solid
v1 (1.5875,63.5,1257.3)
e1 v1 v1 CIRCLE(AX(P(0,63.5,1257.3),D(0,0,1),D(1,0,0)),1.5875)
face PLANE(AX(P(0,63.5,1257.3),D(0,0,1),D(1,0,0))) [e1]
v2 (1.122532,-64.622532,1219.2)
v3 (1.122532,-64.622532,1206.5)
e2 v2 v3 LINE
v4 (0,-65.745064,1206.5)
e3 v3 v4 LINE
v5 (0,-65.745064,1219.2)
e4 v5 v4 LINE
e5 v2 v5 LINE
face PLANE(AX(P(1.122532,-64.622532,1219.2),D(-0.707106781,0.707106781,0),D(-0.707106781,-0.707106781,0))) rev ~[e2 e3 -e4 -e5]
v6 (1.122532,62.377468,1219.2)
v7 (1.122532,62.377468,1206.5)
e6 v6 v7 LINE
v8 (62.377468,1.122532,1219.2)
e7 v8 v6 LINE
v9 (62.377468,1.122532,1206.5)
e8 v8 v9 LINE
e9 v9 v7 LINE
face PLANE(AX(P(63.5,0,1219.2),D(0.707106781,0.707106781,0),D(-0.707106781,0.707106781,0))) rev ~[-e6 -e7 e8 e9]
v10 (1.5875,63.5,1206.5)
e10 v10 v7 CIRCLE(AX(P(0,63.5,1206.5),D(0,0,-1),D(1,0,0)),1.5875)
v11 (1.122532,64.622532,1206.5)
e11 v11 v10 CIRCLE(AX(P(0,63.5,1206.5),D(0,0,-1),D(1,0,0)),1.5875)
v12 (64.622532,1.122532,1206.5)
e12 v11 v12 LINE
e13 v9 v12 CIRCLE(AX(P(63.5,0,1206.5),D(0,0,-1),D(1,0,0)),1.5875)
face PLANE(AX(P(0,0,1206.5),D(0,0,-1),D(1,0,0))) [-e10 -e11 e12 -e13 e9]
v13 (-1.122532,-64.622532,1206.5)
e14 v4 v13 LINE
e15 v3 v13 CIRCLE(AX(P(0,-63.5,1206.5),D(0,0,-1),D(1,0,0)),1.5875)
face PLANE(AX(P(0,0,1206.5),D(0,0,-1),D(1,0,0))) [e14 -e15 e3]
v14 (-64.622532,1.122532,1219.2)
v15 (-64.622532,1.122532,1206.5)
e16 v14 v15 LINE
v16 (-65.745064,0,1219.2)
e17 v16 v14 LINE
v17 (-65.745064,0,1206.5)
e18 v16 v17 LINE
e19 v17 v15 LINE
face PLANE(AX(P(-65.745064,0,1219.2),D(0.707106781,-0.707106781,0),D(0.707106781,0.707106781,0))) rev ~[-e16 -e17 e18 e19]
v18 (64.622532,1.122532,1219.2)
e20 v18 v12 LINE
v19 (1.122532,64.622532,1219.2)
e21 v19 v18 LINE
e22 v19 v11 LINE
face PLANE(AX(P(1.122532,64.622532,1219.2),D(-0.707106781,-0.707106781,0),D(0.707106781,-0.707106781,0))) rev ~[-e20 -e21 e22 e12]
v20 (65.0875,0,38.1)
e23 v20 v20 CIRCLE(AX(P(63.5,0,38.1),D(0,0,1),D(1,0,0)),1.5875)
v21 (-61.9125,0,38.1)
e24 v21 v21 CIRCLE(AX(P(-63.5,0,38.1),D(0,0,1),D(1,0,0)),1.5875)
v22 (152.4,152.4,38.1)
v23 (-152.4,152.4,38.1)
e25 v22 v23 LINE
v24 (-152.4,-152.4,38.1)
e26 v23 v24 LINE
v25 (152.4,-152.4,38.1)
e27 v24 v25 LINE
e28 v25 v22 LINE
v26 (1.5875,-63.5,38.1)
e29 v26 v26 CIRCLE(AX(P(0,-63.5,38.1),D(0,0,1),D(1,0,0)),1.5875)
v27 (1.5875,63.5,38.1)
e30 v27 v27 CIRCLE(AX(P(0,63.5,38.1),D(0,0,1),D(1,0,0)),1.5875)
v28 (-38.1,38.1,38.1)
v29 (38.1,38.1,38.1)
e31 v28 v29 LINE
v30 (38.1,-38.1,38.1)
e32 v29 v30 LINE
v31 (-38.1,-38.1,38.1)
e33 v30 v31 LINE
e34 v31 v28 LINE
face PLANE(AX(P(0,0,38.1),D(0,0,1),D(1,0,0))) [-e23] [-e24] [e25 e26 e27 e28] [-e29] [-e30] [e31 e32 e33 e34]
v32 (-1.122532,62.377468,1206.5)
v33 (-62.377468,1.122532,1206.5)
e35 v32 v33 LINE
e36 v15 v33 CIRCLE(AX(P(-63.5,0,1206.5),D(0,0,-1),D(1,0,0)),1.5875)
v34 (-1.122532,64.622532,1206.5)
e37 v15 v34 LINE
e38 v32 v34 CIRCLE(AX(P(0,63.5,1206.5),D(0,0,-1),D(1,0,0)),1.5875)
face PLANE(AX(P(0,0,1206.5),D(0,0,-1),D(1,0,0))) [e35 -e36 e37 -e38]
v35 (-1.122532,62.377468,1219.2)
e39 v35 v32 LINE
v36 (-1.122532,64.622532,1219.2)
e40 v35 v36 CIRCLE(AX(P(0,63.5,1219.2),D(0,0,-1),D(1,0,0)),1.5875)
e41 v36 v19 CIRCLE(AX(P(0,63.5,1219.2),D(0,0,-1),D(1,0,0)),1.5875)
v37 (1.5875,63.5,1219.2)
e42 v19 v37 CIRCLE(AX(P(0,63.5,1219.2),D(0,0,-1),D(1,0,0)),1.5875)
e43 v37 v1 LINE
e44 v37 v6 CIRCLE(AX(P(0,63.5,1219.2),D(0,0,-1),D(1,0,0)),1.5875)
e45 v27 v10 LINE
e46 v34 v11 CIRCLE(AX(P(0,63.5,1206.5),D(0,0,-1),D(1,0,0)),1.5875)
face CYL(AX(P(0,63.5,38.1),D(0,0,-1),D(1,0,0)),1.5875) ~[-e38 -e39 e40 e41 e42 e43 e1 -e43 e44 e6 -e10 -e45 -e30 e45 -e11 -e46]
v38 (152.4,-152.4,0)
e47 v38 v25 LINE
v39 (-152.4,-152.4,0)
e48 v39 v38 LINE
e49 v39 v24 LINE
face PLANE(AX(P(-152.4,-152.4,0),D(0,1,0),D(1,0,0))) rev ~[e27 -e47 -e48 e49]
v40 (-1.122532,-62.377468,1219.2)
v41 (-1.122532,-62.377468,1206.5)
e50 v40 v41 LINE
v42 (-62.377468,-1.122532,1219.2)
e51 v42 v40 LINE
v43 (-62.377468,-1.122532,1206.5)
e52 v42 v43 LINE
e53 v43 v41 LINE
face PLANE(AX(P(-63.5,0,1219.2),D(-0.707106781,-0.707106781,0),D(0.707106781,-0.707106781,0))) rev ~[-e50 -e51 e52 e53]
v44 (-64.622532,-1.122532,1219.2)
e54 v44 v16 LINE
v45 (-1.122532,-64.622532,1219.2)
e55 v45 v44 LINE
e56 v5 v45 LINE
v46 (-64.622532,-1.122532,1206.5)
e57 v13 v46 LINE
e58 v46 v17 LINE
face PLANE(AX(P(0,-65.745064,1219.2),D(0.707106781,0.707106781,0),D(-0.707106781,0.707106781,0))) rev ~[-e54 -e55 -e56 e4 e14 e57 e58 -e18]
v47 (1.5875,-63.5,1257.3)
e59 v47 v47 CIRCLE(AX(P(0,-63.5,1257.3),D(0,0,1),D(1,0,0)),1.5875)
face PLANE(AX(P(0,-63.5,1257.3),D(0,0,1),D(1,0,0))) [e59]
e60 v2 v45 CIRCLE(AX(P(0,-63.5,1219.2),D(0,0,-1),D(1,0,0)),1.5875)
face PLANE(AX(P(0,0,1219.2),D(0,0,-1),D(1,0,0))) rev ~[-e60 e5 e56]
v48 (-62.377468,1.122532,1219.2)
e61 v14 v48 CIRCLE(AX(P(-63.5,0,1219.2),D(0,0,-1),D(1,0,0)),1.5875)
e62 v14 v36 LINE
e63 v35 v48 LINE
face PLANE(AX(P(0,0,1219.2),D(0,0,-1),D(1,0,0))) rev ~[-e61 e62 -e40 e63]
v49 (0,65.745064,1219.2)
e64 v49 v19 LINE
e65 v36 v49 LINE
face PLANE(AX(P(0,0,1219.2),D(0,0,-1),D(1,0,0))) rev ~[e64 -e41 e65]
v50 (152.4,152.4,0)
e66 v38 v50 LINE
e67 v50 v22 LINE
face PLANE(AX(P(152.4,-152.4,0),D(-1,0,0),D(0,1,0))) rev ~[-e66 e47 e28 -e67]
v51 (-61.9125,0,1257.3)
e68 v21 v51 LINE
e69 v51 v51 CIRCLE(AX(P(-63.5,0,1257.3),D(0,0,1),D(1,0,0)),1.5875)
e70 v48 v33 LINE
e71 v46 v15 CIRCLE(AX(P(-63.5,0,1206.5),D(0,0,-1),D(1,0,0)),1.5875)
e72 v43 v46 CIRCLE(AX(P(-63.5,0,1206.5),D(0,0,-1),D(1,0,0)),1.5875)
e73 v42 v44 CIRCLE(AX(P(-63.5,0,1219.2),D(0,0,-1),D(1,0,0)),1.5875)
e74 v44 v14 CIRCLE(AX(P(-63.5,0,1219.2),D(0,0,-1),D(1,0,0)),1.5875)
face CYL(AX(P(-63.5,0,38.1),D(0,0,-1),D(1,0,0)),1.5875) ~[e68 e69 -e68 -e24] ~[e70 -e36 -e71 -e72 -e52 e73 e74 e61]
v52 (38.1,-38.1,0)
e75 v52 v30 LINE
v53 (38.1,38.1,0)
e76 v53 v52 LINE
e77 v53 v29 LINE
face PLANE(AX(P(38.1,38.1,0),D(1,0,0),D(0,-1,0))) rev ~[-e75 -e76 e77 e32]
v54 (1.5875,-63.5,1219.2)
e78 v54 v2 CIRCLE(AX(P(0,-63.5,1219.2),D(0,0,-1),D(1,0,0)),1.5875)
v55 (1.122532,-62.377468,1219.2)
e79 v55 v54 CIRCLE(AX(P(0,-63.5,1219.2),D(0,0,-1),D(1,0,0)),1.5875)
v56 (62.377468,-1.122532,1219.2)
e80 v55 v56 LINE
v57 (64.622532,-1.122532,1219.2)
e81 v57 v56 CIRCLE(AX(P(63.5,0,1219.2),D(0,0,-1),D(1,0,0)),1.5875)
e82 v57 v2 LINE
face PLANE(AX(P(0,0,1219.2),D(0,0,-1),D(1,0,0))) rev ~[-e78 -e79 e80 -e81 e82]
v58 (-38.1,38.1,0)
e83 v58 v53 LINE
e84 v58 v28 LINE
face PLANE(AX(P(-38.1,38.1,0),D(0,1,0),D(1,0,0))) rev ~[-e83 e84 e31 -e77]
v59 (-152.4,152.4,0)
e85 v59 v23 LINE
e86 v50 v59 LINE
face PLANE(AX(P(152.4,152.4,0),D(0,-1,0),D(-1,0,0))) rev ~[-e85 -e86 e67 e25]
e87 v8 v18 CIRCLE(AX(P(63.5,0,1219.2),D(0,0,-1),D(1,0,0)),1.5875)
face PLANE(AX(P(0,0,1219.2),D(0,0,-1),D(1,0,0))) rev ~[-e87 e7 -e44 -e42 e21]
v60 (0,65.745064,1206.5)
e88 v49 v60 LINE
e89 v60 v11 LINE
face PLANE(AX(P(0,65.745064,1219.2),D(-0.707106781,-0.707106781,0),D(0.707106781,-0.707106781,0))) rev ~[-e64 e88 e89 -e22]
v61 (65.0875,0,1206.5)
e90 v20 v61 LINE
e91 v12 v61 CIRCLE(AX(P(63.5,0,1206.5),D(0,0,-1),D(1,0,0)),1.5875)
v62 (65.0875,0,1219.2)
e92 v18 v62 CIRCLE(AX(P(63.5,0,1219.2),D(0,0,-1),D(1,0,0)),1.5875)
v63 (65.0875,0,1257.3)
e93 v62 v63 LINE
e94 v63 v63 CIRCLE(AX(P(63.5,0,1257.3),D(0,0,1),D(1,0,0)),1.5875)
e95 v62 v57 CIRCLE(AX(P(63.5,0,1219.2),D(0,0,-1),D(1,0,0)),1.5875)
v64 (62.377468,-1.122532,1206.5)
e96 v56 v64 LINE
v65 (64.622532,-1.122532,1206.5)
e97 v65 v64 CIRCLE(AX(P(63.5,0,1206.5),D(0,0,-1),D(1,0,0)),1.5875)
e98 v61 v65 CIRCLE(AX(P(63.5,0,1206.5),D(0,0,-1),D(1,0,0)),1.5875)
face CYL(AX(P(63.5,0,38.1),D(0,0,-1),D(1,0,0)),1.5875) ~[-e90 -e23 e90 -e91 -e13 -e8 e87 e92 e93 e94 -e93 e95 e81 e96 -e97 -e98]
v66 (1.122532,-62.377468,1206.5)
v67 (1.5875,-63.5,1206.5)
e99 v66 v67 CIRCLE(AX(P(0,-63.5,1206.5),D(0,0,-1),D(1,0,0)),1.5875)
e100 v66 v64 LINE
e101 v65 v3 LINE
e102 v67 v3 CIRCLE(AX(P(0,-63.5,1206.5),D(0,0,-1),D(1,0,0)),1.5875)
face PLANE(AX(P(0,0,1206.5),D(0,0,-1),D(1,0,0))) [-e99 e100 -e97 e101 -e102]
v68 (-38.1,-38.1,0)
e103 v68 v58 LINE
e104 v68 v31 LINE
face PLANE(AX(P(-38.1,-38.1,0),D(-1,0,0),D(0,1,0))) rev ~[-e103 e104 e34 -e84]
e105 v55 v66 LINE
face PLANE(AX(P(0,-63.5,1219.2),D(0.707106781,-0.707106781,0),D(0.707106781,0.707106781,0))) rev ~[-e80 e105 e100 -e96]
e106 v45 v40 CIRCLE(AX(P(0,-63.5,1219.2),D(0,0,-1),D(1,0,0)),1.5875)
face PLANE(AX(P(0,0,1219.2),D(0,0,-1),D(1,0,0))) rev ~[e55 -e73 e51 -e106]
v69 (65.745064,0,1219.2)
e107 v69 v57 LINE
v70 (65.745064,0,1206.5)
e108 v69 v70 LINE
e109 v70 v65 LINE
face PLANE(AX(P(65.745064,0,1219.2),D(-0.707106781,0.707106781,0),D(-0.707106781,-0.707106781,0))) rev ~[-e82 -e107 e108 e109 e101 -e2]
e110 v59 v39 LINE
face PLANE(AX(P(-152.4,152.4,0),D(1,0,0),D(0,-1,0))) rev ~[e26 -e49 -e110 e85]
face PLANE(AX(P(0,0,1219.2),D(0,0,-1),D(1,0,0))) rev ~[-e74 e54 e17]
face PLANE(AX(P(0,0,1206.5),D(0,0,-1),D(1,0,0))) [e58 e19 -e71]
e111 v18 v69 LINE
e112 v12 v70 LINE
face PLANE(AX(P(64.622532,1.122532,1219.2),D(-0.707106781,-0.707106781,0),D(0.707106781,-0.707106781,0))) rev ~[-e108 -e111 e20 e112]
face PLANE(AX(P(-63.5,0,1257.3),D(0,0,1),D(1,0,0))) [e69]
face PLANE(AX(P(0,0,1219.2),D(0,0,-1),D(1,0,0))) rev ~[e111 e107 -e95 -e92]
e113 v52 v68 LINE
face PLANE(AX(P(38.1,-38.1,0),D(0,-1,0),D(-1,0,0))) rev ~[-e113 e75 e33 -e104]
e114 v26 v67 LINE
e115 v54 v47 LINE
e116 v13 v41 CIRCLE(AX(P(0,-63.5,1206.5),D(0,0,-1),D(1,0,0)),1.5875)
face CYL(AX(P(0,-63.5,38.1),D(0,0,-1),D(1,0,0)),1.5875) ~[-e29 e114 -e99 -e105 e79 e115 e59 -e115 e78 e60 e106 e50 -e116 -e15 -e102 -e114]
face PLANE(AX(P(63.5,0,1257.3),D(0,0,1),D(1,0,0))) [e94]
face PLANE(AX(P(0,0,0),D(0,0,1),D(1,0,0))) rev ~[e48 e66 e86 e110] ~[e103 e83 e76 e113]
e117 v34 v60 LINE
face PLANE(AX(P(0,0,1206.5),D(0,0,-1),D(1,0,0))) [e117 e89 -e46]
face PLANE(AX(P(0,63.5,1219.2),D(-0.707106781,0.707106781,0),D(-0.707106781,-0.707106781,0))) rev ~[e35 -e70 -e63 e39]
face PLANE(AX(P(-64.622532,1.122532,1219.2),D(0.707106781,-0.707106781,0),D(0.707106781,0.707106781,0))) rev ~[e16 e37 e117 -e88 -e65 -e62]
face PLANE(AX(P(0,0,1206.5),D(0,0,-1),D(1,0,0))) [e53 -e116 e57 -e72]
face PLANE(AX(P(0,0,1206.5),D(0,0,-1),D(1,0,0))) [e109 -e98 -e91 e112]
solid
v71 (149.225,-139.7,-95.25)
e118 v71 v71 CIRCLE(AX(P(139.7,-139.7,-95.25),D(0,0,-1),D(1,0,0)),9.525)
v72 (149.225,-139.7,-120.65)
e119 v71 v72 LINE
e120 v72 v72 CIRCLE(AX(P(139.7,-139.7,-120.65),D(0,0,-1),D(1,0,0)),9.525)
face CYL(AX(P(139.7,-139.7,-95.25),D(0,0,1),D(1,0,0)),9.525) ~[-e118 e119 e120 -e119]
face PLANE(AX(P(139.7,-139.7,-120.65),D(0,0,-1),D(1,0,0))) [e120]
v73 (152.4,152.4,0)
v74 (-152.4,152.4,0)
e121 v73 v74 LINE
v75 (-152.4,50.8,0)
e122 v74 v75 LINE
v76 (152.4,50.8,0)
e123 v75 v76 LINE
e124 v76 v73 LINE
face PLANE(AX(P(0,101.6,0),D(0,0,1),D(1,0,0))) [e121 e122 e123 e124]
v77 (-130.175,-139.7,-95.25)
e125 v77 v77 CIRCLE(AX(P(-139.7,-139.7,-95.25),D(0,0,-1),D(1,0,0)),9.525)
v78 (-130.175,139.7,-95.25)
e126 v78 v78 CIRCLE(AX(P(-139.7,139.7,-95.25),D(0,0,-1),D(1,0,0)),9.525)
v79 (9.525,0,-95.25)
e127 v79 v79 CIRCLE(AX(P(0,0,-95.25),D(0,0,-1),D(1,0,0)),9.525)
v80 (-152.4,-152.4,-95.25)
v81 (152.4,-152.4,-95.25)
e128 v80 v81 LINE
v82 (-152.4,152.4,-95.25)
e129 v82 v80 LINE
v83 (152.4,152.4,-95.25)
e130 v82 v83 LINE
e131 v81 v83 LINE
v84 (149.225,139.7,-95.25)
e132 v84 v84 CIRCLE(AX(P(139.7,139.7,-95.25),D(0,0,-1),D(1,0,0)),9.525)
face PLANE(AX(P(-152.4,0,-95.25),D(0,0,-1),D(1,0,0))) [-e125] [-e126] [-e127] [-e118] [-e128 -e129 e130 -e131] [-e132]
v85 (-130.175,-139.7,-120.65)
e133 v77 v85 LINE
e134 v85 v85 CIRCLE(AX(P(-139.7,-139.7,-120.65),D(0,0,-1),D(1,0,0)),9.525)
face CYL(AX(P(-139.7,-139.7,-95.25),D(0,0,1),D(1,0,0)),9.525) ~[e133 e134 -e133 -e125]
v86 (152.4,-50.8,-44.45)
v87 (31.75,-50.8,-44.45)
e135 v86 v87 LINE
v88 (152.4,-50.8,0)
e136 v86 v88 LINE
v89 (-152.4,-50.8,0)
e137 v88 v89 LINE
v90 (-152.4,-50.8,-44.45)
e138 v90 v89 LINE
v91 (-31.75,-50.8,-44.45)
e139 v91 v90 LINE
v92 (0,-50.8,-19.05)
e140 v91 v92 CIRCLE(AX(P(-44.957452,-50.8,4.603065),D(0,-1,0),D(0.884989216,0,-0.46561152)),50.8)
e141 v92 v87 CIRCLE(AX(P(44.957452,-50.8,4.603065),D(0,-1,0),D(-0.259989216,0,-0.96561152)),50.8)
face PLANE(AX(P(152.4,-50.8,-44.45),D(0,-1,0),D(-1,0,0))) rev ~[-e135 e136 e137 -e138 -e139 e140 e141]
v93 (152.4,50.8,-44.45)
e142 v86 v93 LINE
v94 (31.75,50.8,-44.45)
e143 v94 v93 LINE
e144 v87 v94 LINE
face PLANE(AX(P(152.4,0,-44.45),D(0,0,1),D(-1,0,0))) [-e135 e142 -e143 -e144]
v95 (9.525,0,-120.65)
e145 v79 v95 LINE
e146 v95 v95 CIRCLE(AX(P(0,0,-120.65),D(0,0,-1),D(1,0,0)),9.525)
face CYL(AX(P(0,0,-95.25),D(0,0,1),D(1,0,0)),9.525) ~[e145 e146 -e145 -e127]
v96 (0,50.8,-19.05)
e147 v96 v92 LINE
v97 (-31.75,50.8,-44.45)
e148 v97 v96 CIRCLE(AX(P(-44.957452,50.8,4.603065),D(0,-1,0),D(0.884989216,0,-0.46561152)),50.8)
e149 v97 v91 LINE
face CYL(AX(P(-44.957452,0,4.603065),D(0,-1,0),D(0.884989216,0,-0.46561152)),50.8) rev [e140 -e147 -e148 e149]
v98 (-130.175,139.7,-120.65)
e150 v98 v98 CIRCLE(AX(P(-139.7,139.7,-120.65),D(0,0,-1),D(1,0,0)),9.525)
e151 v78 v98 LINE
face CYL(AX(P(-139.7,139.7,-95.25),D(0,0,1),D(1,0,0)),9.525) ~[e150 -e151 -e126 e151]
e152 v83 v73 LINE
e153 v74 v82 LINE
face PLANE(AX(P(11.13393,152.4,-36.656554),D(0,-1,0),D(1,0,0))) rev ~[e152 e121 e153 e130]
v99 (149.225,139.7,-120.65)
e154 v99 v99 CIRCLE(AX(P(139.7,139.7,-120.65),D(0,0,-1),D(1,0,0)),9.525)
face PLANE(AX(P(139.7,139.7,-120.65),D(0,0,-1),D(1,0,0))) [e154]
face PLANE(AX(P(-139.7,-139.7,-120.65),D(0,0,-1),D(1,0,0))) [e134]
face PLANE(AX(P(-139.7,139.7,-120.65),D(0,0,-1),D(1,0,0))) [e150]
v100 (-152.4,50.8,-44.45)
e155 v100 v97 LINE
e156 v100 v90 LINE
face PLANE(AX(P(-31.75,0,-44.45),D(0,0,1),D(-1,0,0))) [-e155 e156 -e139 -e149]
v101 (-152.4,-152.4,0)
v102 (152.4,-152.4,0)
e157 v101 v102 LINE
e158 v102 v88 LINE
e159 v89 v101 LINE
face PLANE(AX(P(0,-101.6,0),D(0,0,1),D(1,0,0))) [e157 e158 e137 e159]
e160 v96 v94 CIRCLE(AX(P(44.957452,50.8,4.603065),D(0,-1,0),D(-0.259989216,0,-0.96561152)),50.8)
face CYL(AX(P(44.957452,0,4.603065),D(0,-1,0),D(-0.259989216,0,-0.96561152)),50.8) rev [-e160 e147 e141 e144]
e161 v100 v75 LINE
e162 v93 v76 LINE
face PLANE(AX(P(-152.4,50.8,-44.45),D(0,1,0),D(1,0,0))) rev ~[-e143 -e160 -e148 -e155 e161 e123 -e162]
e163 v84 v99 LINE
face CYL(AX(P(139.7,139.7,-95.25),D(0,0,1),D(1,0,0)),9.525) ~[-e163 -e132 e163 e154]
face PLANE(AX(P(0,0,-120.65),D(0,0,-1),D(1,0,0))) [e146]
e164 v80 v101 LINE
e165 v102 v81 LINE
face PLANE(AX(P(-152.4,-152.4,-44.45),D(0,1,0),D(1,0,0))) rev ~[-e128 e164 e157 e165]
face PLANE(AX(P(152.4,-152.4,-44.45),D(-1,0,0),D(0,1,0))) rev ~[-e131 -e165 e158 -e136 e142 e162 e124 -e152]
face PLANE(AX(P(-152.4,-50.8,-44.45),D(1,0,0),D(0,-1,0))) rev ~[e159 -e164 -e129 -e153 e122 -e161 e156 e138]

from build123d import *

# Parameters (mm, degrees)
F1_DEPTH  = 38.1
F3_DEPTH  = 152.4
F5_DEPTH  = 44.45
F6_R      = 9.525
F7_DEPTH  = 25.4
F8_R      = 1.5875
F9_DEPTH  = 1219.2
F12_DEPTH = 12.7


with BuildPart() as f1:
    # F0 (on Top) → F1 (new body)
    with BuildSketch(Plane.XY):
        Polygon((-152.4, 152.4), (-152.4, 0), (-152.4, -152.4), (152.4, -152.4), (152.4, 0), (152.4, 152.4), align=None)
        Polygon((-38.1, 38.1), (0, 38.1), (38.1, 38.1), (38.1, -38.1), (-38.1, -38.1), align=None, mode=Mode.SUBTRACT)
    extrude(amount=F1_DEPTH)

    # F8 (on face) → F9 (join)
    with BuildSketch(Plane.XY.offset(38.1)):
        with Locations((0, 63.5)):
            Circle(F8_R)
        with Locations((63.5, 0)):
            Circle(F8_R)
        with Locations((-63.5, 0)):
            Circle(F8_R)
        with Locations((0, -63.5)):
            Circle(F8_R)
    extrude(amount=F9_DEPTH)

    # F11 (on offset) → F12 (join)
    with BuildSketch(Plane(origin=(0, 0, 1219.2), x_dir=(1, 0, 0), z_dir=(0, 0, -1))):
        Polygon((0, -65.7450640303), (1.1225320151, -64.6225320151), (64.6225320151, -1.1225320151), (65.7450640303, 0), (1.1225320151, 64.6225320151), (0, 65.7450640303), (-65.7450640303, 0), (-64.6225320151, -1.1225320151), align=None)
        Polygon((0, -63.5), (-63.5, 0), (0, 63.5), (63.5, 0), align=None, mode=Mode.SUBTRACT)
    extrude(amount=F12_DEPTH)


with BuildPart() as f3:
    # F2 (on Front) → F3 (new body, symmetric)
    with BuildSketch(Plane.XZ):
        with BuildLine():
            ThreePointArc((31.75, -44.45), (13.2229437572, -35.0650703036), (0, -19.05))
            Line((0, -19.05), (0, -44.45))
            Line((0, -44.45), (31.75, -44.45))
        make_face()
        with BuildLine():
            Line((0, -44.45), (0, -19.05))
            ThreePointArc((0, -19.05), (-13.2229437572, -35.0650703036), (-31.75, -44.45))
            Line((-31.75, -44.45), (0, -44.45))
        make_face()
        Polygon((31.75, -44.45), (0, -44.45), (-31.75, -44.45), (-152.4, -44.45), (-152.4, -95.25), (152.4, -95.25), (152.4, -44.45), align=None)
    extrude(amount=F3_DEPTH, both=True)

    # F4 (on face) → F5 (join)
    with BuildSketch(Plane.XY.offset(-44.45)):
        Polygon((152.4, -50.8), (0, -50.8), (-152.4, -50.8), (-152.4, -152.4), (152.4, -152.4), align=None)
        Polygon((-152.4, 50.8), (0, 50.8), (152.4, 50.8), (152.4, 152.4), (-152.4, 152.4), align=None)
    extrude(amount=F5_DEPTH)

    # F6 (on face) → F7 (join)
    with BuildSketch(Plane(origin=(0, 0, -95.25), x_dir=(1, 0, 0), z_dir=(0, 0, -1))):
        with Locations((-139.7, 139.7)):
            Circle(F6_R)
        with Locations((139.7, 139.7)):
            Circle(F6_R)
        with Locations((139.7, -139.7)):
            Circle(F6_R)
        with Locations((-139.7, -139.7)):
            Circle(F6_R)
        Circle(F6_R)
    extrude(amount=F7_DEPTH)


solid = Compound([f1.part, f3.part])
